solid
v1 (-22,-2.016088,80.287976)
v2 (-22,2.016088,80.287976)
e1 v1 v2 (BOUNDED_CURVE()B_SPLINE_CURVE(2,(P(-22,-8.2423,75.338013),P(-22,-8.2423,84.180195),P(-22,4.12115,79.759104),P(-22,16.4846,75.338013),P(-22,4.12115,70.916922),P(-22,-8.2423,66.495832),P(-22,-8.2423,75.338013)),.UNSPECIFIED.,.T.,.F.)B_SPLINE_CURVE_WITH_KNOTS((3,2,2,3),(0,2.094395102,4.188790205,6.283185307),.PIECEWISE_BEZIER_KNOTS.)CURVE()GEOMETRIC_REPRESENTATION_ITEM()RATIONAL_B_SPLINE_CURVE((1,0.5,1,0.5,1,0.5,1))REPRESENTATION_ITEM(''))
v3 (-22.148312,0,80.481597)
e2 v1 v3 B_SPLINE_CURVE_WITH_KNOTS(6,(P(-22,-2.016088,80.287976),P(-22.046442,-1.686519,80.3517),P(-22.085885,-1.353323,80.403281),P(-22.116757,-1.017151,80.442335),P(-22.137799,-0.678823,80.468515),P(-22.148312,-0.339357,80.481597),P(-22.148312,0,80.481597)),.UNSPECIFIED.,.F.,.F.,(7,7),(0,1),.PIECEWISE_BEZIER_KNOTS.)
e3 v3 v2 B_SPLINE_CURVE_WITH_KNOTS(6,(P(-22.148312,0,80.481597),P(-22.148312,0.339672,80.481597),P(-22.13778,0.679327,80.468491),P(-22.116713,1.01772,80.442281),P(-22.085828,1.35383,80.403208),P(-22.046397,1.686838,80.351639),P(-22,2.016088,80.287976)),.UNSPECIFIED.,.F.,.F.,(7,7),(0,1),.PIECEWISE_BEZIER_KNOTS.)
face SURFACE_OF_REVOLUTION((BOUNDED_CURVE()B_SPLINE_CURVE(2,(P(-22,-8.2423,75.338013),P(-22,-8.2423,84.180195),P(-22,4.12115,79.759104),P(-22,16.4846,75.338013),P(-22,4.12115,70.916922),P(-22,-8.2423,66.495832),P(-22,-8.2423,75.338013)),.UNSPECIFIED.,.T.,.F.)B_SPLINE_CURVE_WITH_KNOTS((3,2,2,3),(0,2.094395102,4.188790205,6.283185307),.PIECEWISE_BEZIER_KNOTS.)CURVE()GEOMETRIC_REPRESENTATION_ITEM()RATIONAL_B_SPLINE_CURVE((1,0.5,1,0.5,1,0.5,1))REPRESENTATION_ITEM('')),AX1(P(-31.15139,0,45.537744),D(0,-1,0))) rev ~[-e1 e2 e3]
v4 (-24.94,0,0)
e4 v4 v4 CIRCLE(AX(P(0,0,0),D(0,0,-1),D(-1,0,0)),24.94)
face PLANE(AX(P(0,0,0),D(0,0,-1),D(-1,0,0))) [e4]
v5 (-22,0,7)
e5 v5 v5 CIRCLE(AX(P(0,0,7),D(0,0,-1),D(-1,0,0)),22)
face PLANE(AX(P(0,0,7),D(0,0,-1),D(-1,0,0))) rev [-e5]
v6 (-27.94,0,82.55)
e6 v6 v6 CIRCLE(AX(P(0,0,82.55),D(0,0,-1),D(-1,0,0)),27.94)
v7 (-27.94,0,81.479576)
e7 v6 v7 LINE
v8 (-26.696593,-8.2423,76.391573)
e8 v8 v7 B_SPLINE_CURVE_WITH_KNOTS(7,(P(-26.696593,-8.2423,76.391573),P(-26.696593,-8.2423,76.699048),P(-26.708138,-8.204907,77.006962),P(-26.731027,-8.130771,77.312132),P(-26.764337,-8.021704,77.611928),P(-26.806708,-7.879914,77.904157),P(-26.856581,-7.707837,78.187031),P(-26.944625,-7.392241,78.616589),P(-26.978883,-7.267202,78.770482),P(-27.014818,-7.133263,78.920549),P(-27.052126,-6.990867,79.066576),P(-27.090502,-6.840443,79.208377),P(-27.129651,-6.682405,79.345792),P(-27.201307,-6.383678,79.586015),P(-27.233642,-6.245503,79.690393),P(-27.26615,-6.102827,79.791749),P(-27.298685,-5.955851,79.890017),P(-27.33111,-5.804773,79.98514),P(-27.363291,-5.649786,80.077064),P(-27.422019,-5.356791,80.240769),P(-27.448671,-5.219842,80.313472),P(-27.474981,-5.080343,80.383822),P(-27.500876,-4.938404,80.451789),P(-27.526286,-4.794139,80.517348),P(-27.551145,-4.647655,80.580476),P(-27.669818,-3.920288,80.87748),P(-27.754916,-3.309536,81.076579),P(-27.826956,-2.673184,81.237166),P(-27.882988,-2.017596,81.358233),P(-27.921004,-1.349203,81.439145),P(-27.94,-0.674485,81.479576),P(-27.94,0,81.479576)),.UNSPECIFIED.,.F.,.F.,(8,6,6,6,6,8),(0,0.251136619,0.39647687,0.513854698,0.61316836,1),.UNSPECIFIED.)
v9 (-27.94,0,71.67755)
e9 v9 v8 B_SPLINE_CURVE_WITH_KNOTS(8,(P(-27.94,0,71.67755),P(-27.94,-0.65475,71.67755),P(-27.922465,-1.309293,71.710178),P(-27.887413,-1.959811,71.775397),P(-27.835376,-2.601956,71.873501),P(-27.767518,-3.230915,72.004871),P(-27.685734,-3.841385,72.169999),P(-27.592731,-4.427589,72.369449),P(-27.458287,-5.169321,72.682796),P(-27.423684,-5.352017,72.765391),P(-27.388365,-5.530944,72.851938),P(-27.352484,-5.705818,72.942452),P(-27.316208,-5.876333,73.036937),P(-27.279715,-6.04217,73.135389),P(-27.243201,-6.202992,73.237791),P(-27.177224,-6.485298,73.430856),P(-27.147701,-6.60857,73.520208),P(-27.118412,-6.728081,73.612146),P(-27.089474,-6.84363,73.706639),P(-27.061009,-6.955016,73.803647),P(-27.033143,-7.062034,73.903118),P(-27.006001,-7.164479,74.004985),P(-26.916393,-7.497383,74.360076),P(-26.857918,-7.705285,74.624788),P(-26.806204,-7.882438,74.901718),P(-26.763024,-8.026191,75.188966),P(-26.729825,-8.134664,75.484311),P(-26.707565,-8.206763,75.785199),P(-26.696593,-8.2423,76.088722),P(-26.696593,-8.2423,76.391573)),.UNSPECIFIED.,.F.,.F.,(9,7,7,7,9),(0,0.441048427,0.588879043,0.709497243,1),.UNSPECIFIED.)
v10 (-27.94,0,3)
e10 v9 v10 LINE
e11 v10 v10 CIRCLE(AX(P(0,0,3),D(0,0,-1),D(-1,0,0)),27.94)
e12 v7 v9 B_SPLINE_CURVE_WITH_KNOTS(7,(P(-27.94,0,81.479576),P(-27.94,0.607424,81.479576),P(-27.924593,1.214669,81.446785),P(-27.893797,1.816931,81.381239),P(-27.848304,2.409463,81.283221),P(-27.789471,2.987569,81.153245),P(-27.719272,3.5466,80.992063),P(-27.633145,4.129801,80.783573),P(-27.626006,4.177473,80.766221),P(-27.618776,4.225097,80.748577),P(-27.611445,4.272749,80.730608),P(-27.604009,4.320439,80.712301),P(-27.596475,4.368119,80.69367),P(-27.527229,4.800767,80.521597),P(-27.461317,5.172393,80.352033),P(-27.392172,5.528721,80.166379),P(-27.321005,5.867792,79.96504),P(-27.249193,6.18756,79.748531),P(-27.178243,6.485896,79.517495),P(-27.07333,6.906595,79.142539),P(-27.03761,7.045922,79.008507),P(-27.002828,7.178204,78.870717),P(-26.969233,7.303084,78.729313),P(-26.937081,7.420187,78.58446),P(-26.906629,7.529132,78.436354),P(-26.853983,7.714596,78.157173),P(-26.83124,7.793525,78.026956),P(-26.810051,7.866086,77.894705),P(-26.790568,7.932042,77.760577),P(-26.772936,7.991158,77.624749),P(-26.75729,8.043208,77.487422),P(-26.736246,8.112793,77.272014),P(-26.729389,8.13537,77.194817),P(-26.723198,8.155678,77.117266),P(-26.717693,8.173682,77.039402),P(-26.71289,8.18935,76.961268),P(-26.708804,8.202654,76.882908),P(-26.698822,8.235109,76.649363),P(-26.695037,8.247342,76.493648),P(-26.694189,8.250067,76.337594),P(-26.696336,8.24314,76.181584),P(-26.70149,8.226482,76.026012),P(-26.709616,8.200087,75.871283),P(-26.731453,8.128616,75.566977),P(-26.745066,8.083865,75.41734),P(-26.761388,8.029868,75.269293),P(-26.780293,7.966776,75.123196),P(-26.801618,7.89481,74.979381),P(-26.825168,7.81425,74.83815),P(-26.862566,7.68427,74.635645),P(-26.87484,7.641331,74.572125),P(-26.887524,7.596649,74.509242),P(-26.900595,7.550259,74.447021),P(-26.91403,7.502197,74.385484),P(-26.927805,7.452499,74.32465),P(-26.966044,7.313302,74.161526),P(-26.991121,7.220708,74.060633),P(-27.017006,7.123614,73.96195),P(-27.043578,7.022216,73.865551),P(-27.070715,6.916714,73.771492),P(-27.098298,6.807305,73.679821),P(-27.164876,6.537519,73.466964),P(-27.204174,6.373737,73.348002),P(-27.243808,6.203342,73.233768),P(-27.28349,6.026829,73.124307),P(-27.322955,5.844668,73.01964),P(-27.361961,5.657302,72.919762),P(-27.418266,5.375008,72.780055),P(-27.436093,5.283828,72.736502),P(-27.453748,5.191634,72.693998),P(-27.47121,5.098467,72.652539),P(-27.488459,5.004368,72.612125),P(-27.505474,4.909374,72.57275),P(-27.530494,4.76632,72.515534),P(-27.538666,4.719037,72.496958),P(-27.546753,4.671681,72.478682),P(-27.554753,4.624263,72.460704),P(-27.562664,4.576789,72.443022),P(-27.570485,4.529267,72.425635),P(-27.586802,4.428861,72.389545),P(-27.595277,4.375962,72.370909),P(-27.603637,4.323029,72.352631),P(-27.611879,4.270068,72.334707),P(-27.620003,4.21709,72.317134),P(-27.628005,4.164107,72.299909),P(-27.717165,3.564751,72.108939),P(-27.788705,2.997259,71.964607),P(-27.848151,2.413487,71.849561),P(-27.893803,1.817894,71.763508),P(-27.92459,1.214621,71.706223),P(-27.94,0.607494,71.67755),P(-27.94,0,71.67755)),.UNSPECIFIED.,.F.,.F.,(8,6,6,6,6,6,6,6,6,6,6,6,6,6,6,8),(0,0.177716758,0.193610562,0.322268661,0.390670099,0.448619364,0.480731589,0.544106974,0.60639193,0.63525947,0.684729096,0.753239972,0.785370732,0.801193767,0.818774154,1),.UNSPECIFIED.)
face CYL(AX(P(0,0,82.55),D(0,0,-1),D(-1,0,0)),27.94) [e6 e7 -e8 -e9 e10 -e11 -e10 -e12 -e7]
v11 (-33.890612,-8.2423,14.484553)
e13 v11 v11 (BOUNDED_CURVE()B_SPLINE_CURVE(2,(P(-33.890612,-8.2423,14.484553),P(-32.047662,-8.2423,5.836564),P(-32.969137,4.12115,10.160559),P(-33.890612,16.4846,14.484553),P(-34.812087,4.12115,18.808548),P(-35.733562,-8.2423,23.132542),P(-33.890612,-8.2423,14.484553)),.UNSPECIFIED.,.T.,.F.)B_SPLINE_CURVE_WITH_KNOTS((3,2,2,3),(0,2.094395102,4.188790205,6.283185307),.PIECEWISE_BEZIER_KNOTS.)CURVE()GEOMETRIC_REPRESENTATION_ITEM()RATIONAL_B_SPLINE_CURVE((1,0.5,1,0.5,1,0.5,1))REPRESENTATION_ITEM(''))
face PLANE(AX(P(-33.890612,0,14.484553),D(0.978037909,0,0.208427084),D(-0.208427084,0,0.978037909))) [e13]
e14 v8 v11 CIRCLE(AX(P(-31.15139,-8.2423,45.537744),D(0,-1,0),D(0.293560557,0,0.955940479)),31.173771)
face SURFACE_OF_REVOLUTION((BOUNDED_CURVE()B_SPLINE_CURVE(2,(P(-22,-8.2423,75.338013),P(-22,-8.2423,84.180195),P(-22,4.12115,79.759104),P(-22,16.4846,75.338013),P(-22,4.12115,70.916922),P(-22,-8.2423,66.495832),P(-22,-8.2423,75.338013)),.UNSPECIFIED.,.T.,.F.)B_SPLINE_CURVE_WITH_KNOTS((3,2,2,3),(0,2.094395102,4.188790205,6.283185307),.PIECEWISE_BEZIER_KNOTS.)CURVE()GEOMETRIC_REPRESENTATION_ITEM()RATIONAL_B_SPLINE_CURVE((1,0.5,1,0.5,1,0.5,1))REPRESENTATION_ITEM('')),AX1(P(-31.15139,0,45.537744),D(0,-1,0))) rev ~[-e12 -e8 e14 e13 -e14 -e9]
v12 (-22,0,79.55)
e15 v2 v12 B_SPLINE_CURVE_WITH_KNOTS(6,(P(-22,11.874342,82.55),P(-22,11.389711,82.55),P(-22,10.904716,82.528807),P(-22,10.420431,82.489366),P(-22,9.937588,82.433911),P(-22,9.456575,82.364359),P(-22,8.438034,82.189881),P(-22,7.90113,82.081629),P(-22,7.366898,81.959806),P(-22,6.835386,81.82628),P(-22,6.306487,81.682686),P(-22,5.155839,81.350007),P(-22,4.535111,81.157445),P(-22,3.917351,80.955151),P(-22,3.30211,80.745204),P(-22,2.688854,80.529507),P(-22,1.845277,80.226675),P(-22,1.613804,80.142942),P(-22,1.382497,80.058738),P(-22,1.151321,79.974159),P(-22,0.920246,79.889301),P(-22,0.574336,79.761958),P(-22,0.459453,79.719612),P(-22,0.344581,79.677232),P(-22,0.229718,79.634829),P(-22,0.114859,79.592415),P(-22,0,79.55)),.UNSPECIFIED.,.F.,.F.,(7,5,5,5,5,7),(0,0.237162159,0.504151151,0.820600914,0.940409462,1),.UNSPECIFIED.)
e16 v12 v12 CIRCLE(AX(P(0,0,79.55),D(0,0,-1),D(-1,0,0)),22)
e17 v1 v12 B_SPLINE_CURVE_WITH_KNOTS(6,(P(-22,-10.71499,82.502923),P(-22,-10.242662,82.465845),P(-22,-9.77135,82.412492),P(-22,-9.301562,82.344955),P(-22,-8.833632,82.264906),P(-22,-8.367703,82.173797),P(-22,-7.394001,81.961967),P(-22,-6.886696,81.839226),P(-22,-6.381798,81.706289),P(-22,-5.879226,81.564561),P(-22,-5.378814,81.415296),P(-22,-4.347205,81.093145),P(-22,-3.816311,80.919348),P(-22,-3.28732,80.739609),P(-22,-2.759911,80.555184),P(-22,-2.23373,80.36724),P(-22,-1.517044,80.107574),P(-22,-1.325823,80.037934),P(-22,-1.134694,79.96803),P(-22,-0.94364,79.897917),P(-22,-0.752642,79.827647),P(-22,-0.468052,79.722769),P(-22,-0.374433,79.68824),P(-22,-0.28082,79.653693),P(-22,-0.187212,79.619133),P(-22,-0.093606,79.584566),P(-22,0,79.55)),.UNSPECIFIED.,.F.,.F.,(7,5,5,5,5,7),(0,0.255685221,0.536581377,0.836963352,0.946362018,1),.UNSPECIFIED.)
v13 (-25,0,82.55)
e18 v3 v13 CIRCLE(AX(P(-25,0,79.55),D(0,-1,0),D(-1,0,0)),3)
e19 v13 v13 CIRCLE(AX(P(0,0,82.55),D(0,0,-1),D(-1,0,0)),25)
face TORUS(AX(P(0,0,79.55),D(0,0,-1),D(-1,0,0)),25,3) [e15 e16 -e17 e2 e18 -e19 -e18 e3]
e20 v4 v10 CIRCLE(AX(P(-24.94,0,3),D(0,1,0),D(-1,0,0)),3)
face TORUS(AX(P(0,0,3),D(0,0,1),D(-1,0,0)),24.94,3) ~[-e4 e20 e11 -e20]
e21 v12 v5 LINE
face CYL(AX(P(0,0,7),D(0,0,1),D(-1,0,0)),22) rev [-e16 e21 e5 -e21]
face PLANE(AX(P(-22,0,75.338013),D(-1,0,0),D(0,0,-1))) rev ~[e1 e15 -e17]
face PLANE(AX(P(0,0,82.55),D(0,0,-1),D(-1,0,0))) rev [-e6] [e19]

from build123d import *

# Parameters (mm, degrees)
F2_R = 3


with BuildPart() as f1:
    # F0 (on Front) → F1 (revolve)
    with BuildSketch(Plane.XZ):
        Polygon((-27.94, 0), (0, 0), (0, 7), (-22, 7), (-22, 82.55), (-27.94, 82.55), align=None)
    revolve(axis=Axis((0, 0, 3.5), (0, 0, -1)))

    # F2
    f2_edges = [f1.edges().sort_by_distance(p)[0] for p in [
        (22, 0, 82.55),
        (27.94, 0, 0),
    ]]
    fillet(f2_edges, radius=F2_R)

    # F6: sweep along a path in F4
    with BuildLine(Plane.XZ) as f6_path:
        ThreePointArc((-27.9568824917, 75.0939920545), (-60.8796643301, 45.6174495611), (-28.1154159456, 15.9647911787))
    # F5 (on line) → F6 (sweep)
    with BuildSketch(Plane(origin=(-22, 0, 0), x_dir=(0, -1, 0), z_dir=(-1, 0, 0))):
        with BuildLine():
            add(Edge.make_bspline(
                [(8.2423, 75.3380134702), (8.2423, 84.1801954249), (-4.12115, 79.7591044475), (-16.4846, 75.3380134702), (-4.12115, 70.9169224928), (8.2423, 66.4958315155), (8.2423, 75.3380134702)],
                knots=[0, 0, 0, 2.0943951024, 2.0943951024, 4.1887902048, 4.1887902048, 6.2831853072, 6.2831853072, 6.2831853072], degree=2, weights=[1, 0.5, 1, 0.5, 1, 0.5, 1]))
        make_face()
    sweep(path=f6_path.line)


solid = f1.part
